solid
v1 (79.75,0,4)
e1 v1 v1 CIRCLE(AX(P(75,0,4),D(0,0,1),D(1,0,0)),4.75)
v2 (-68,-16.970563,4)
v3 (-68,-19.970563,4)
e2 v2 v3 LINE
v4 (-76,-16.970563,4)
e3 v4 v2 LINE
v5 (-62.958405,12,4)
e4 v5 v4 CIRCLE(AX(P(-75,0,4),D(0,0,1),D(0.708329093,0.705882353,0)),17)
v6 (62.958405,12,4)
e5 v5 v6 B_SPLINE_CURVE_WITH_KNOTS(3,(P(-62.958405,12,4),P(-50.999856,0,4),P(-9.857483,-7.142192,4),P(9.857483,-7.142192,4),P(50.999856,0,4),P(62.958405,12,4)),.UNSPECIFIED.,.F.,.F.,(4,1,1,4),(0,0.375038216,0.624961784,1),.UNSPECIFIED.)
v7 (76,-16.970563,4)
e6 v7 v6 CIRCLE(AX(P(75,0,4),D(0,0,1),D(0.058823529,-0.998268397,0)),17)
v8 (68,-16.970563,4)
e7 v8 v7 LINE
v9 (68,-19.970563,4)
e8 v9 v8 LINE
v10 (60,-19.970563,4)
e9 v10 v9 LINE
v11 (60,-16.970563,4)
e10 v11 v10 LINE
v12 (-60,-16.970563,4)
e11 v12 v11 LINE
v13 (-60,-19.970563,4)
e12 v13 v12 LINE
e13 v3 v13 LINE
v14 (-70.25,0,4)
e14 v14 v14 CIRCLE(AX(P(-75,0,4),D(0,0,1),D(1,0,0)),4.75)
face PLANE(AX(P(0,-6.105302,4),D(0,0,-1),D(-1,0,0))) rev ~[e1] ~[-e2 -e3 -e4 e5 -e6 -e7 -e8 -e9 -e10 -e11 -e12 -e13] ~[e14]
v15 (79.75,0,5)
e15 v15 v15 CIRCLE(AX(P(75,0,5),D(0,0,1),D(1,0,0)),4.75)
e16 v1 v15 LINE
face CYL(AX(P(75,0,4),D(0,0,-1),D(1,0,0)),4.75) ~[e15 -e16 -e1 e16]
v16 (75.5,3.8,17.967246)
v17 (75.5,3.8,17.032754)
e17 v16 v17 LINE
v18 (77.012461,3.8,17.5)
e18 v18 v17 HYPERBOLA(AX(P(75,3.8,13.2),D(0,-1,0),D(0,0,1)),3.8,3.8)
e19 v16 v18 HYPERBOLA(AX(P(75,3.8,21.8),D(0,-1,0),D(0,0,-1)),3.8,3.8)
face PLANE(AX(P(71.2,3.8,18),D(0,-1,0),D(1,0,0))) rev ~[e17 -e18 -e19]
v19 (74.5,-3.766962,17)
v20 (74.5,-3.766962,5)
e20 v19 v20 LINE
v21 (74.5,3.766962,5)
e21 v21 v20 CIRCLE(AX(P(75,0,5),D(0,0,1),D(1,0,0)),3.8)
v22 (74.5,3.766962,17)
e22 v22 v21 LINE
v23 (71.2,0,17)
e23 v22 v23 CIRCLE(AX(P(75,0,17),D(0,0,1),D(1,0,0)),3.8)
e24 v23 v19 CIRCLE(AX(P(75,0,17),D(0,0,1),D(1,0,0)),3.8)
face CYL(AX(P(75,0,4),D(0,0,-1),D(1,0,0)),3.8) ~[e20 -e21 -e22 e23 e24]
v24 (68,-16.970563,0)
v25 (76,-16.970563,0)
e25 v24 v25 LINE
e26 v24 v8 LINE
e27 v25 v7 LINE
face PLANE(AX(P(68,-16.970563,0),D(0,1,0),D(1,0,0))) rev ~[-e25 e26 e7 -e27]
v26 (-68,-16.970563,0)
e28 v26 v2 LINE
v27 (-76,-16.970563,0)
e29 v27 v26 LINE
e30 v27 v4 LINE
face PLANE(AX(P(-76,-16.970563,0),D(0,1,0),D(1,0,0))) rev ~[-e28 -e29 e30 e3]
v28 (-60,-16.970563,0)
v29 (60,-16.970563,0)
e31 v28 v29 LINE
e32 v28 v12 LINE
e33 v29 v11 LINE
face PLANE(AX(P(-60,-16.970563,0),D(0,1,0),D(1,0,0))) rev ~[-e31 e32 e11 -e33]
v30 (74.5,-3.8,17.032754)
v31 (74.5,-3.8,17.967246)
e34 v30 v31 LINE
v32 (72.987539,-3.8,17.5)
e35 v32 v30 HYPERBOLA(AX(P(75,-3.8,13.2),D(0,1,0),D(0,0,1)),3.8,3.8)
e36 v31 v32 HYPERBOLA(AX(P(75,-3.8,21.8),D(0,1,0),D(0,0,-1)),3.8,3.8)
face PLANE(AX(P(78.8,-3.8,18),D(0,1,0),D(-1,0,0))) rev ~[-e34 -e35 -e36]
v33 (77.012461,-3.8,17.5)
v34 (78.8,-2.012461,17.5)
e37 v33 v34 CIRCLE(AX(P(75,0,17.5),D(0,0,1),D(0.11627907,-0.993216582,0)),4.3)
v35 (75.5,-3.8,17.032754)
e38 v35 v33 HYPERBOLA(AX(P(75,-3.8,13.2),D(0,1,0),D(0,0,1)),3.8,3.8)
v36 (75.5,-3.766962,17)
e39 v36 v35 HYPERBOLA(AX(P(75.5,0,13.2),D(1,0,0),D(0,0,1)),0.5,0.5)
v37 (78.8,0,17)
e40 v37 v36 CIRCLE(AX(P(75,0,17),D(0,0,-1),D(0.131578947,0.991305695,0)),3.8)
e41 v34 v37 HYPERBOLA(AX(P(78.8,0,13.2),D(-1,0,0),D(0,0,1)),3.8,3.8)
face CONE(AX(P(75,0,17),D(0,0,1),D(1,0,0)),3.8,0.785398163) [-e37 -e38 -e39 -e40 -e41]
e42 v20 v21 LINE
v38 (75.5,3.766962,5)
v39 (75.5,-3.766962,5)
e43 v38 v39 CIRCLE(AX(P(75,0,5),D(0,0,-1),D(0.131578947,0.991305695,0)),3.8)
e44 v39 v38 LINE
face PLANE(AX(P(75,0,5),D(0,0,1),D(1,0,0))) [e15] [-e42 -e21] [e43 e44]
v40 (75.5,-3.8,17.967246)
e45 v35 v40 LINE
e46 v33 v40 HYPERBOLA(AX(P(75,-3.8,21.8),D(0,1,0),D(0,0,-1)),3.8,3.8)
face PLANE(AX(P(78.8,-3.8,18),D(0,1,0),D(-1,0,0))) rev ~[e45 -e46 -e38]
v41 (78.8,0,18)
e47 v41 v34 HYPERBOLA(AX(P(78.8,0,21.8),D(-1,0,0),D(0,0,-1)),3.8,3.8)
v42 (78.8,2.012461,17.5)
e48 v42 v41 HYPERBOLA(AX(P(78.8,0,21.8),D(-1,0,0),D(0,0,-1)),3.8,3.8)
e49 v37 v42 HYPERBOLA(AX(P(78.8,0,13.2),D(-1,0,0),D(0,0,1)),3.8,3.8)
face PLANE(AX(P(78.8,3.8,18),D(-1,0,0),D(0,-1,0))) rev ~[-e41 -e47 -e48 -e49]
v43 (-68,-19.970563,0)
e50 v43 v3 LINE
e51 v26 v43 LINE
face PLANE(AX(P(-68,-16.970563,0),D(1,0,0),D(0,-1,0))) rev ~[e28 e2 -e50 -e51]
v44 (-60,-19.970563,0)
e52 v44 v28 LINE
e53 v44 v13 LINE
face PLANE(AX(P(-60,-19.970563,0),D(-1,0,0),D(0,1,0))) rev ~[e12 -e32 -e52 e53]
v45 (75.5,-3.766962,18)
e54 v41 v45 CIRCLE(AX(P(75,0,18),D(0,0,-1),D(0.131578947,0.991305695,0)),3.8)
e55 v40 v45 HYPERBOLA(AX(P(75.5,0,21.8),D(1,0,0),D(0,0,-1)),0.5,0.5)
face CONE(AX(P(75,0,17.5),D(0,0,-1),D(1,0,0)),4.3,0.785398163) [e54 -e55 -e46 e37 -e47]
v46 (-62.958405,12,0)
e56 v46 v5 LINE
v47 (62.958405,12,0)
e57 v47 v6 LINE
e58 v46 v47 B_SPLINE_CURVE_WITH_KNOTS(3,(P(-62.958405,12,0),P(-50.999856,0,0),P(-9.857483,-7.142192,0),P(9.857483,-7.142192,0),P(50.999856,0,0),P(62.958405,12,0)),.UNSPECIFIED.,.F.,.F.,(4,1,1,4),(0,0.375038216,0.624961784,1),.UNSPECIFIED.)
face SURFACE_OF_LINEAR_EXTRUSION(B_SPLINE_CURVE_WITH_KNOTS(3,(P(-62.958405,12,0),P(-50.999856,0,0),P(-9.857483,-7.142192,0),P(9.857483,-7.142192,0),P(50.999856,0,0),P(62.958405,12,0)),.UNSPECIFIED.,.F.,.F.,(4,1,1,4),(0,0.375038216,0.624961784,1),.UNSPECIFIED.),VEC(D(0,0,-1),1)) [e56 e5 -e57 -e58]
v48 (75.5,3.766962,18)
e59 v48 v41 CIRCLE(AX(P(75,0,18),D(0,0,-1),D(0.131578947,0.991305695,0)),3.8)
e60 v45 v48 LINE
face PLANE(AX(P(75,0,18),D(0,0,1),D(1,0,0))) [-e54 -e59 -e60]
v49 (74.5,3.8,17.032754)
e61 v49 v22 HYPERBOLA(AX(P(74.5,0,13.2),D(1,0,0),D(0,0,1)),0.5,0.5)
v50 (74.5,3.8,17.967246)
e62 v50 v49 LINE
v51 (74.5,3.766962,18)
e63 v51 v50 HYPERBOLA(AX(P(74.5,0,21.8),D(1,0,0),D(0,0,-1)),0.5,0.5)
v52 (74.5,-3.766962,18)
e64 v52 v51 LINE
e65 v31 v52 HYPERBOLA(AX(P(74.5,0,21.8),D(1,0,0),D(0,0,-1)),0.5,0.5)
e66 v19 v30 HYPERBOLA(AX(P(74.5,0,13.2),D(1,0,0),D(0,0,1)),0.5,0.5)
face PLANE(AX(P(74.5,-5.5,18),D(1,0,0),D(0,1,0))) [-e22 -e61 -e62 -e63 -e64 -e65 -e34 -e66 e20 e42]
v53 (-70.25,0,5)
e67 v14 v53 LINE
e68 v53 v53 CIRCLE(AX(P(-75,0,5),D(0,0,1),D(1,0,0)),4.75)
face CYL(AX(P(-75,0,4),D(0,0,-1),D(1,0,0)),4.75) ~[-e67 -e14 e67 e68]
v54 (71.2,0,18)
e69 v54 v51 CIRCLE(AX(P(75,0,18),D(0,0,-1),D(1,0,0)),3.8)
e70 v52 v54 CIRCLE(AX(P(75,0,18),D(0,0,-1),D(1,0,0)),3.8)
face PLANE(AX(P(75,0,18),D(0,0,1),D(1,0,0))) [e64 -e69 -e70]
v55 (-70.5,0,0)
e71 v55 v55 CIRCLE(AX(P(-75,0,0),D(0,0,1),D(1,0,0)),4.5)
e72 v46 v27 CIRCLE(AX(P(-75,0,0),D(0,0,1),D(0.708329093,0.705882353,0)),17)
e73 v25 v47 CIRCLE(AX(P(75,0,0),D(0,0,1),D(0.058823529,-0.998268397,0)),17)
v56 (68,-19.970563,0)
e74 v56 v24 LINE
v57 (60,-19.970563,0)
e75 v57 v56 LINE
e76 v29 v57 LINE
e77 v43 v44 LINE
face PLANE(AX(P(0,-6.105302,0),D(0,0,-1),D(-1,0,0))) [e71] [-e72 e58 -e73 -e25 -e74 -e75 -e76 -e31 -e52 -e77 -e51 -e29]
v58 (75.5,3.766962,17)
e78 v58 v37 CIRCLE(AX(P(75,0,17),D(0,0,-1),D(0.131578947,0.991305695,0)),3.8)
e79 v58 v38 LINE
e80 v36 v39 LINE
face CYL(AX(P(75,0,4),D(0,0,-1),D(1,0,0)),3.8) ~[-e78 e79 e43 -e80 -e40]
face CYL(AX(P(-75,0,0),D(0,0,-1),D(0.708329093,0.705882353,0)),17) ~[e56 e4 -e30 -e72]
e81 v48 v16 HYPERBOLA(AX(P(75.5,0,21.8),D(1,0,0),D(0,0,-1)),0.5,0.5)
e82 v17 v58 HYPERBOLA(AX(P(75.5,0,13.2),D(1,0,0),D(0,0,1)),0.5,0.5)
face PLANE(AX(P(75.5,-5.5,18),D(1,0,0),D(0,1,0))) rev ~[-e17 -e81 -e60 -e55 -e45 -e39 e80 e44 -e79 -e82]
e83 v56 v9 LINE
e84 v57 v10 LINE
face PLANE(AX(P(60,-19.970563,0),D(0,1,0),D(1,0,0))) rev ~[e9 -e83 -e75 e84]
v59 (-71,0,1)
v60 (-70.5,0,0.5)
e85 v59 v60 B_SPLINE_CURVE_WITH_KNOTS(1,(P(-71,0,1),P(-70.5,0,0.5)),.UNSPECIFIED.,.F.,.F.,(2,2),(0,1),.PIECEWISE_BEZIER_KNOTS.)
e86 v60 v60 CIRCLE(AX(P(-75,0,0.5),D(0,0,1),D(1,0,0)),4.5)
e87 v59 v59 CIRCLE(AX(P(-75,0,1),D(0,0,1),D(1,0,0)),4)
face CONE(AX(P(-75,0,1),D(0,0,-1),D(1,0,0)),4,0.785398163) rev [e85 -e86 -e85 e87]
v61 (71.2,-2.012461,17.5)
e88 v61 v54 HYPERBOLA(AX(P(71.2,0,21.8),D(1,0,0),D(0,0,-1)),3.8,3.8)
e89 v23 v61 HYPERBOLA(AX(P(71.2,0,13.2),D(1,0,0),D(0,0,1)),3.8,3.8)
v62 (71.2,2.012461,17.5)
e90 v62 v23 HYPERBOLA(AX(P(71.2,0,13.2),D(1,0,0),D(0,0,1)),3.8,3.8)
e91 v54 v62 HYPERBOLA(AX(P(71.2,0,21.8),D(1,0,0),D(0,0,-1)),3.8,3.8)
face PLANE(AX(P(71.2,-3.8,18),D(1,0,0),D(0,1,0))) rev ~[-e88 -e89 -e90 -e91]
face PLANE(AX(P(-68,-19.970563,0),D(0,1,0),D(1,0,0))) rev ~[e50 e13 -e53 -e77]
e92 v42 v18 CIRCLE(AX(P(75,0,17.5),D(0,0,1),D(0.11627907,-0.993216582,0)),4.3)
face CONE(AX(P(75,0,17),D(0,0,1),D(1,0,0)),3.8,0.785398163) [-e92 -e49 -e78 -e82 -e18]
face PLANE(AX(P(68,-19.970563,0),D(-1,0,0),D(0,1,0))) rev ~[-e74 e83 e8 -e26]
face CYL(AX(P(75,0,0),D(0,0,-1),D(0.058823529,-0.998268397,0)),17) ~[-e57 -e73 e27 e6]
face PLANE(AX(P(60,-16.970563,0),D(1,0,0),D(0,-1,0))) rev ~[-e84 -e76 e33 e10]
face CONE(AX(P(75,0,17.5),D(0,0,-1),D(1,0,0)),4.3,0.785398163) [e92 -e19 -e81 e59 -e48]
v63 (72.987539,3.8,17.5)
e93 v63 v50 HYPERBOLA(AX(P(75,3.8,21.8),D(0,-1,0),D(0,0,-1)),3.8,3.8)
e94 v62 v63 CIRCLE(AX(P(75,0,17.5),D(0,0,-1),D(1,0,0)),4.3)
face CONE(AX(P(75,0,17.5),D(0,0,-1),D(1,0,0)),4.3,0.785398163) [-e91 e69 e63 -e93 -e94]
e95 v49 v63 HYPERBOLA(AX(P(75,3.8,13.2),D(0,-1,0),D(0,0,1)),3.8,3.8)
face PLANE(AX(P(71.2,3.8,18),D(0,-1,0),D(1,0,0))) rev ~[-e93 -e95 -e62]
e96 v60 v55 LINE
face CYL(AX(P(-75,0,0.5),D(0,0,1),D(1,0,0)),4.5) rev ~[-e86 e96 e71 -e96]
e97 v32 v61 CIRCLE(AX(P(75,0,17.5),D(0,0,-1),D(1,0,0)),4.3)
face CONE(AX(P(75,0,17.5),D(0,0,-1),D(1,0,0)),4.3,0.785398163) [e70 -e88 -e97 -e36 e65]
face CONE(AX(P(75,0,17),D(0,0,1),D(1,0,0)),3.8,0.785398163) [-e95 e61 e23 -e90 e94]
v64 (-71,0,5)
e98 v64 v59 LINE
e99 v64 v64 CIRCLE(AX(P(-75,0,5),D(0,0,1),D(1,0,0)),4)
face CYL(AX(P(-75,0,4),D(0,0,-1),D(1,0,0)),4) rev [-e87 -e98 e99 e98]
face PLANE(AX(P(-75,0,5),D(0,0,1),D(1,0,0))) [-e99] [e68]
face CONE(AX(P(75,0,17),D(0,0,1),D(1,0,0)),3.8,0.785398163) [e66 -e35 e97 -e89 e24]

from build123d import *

# Parameters (mm, degrees)
F2_DEPTH  = 4
F3_R      = 3.8
F4_DEPTH  = 13
F5_R      = 3.8
F6_DEPTH  = 0.5
F6_TAPER  = -45
F7_R      = 4.3
F8_DEPTH  = 0.5
F8_TAPER  = 45
F9_W      = 1
F9_H      = 11
F10_DEPTH = 13
F11_R     = 4
F12_DEPTH = 3
F13_R     = 4
F14_DEPTH = 0.5
F14_TAPER = -45
F15_DEPTH = 0.5
F16_R     = 4.75
F16_R_2   = 4
F16_R_3   = 3.8
F17_DEPTH = 1
F18_W     = 11.6
F18_H     = 11.6
F19_DEPTH = 5


with BuildPart() as f2:
    # F1 (on Top) → F2 (new body)
    with BuildSketch(Plane.XY):
        with BuildLine():
            add(Edge.make_bspline(
                [(-62.9584054212, 12), (-50.9998563223, 0), (-9.8574829598, -7.14219171), (9.8574829598, -7.14219171), (50.9998563223, 0), (62.9584054212, 12)],
                knots=[0, 0, 0, 0, 0.3750382163, 0.6249617837, 1, 1, 1, 1], degree=3))
            ThreePointArc((-62.9584054212, 12), (-90.5016960105, 6.9783537313), (-76, -16.9705627485))
            Line((-76, -16.9705627485), (-68, -16.9705627485))
            Line((-68, -16.9705627485), (-68, -19.9705627485))
            Line((-68, -19.9705627485), (-60, -19.9705627485))
            Line((-60, -19.9705627485), (-60, -16.9705627485))
            Line((-60, -16.9705627485), (60, -16.9705627485))
            Line((60, -16.9705627485), (60, -19.9705627485))
            Line((60, -19.9705627485), (68, -19.9705627485))
            Line((68, -19.9705627485), (68, -16.9705627485))
            Line((68, -16.9705627485), (76, -16.9705627485))
            ThreePointArc((76, -16.9705627485), (90.5016960105, 6.9783537313), (62.9584054212, 12))
        make_face()
    extrude(amount=F2_DEPTH)

    # F3 (on face) → F4 (join)
    with BuildSketch(Plane.XY.offset(4)):
        with Locations((75, 0)):
            Circle(F3_R)
    extrude(amount=F4_DEPTH)

    # F5 (on face) → F6 (join)
    with BuildSketch(Plane.XY.offset(17)):
        with Locations((75, 0)):
            Circle(F5_R)
    extrude(amount=F6_DEPTH, taper=F6_TAPER)

    # F7 (on face) → F8 (join)
    with BuildSketch(Plane.XY.offset(17.5)):
        with Locations((75, 0)):
            Circle(F7_R)
    extrude(amount=F8_DEPTH, taper=F8_TAPER)

    # F9 (on face) → F10 (cut)
    with BuildSketch(Plane.XY.offset(18)):
        with Locations((75, 0)):
            Rectangle(F9_W, F9_H)
    extrude(amount=-F10_DEPTH, mode=Mode.SUBTRACT)

    # F11 (on face) → F12 (cut)
    with BuildSketch(Plane.XY.offset(4)):
        with Locations((-75, 0)):
            Circle(F11_R)
    extrude(amount=-F12_DEPTH, mode=Mode.SUBTRACT)

    # F13 (on face) → F14 (cut)
    with BuildSketch(Plane.XY.offset(1)):
        with Locations((-75, 0)):
            Circle(F13_R)
    extrude(amount=-F14_DEPTH, taper=F14_TAPER, mode=Mode.SUBTRACT)

    # F15 (cut): a face of the model
    f15_faces = [f2.faces().sort_by_distance(p)[0] for p in [
        (-75, 0, 0.5),
    ]]
    extrude(f15_faces, amount=-F15_DEPTH, mode=Mode.SUBTRACT)

    # F16 (on face) → F17 (join)
    with BuildSketch(Plane.XY.offset(4)):
        with Locations((-75, 0)):
            Circle(F16_R)
        with Locations((-75, 0)):
            Circle(F16_R_2, mode=Mode.SUBTRACT)
        with Locations((75, 0)):
            Circle(F16_R)
        with Locations((75, 0)):
            Circle(F16_R_3, mode=Mode.SUBTRACT)
    extrude(amount=F17_DEPTH)

    # F18 (on face) → F19 (cut)
    with BuildSketch(Plane.XY.offset(18)):
        with Locations((75, 0)):
            Rectangle(F18_W, F18_H)
        Polygon((71.2, 0), (71.2, 3.8), (78.8, 3.8), (78.8, -3.8), (71.2, -3.8), align=None, mode=Mode.SUBTRACT)
    extrude(amount=-F19_DEPTH, mode=Mode.SUBTRACT)


solid = f2.part
